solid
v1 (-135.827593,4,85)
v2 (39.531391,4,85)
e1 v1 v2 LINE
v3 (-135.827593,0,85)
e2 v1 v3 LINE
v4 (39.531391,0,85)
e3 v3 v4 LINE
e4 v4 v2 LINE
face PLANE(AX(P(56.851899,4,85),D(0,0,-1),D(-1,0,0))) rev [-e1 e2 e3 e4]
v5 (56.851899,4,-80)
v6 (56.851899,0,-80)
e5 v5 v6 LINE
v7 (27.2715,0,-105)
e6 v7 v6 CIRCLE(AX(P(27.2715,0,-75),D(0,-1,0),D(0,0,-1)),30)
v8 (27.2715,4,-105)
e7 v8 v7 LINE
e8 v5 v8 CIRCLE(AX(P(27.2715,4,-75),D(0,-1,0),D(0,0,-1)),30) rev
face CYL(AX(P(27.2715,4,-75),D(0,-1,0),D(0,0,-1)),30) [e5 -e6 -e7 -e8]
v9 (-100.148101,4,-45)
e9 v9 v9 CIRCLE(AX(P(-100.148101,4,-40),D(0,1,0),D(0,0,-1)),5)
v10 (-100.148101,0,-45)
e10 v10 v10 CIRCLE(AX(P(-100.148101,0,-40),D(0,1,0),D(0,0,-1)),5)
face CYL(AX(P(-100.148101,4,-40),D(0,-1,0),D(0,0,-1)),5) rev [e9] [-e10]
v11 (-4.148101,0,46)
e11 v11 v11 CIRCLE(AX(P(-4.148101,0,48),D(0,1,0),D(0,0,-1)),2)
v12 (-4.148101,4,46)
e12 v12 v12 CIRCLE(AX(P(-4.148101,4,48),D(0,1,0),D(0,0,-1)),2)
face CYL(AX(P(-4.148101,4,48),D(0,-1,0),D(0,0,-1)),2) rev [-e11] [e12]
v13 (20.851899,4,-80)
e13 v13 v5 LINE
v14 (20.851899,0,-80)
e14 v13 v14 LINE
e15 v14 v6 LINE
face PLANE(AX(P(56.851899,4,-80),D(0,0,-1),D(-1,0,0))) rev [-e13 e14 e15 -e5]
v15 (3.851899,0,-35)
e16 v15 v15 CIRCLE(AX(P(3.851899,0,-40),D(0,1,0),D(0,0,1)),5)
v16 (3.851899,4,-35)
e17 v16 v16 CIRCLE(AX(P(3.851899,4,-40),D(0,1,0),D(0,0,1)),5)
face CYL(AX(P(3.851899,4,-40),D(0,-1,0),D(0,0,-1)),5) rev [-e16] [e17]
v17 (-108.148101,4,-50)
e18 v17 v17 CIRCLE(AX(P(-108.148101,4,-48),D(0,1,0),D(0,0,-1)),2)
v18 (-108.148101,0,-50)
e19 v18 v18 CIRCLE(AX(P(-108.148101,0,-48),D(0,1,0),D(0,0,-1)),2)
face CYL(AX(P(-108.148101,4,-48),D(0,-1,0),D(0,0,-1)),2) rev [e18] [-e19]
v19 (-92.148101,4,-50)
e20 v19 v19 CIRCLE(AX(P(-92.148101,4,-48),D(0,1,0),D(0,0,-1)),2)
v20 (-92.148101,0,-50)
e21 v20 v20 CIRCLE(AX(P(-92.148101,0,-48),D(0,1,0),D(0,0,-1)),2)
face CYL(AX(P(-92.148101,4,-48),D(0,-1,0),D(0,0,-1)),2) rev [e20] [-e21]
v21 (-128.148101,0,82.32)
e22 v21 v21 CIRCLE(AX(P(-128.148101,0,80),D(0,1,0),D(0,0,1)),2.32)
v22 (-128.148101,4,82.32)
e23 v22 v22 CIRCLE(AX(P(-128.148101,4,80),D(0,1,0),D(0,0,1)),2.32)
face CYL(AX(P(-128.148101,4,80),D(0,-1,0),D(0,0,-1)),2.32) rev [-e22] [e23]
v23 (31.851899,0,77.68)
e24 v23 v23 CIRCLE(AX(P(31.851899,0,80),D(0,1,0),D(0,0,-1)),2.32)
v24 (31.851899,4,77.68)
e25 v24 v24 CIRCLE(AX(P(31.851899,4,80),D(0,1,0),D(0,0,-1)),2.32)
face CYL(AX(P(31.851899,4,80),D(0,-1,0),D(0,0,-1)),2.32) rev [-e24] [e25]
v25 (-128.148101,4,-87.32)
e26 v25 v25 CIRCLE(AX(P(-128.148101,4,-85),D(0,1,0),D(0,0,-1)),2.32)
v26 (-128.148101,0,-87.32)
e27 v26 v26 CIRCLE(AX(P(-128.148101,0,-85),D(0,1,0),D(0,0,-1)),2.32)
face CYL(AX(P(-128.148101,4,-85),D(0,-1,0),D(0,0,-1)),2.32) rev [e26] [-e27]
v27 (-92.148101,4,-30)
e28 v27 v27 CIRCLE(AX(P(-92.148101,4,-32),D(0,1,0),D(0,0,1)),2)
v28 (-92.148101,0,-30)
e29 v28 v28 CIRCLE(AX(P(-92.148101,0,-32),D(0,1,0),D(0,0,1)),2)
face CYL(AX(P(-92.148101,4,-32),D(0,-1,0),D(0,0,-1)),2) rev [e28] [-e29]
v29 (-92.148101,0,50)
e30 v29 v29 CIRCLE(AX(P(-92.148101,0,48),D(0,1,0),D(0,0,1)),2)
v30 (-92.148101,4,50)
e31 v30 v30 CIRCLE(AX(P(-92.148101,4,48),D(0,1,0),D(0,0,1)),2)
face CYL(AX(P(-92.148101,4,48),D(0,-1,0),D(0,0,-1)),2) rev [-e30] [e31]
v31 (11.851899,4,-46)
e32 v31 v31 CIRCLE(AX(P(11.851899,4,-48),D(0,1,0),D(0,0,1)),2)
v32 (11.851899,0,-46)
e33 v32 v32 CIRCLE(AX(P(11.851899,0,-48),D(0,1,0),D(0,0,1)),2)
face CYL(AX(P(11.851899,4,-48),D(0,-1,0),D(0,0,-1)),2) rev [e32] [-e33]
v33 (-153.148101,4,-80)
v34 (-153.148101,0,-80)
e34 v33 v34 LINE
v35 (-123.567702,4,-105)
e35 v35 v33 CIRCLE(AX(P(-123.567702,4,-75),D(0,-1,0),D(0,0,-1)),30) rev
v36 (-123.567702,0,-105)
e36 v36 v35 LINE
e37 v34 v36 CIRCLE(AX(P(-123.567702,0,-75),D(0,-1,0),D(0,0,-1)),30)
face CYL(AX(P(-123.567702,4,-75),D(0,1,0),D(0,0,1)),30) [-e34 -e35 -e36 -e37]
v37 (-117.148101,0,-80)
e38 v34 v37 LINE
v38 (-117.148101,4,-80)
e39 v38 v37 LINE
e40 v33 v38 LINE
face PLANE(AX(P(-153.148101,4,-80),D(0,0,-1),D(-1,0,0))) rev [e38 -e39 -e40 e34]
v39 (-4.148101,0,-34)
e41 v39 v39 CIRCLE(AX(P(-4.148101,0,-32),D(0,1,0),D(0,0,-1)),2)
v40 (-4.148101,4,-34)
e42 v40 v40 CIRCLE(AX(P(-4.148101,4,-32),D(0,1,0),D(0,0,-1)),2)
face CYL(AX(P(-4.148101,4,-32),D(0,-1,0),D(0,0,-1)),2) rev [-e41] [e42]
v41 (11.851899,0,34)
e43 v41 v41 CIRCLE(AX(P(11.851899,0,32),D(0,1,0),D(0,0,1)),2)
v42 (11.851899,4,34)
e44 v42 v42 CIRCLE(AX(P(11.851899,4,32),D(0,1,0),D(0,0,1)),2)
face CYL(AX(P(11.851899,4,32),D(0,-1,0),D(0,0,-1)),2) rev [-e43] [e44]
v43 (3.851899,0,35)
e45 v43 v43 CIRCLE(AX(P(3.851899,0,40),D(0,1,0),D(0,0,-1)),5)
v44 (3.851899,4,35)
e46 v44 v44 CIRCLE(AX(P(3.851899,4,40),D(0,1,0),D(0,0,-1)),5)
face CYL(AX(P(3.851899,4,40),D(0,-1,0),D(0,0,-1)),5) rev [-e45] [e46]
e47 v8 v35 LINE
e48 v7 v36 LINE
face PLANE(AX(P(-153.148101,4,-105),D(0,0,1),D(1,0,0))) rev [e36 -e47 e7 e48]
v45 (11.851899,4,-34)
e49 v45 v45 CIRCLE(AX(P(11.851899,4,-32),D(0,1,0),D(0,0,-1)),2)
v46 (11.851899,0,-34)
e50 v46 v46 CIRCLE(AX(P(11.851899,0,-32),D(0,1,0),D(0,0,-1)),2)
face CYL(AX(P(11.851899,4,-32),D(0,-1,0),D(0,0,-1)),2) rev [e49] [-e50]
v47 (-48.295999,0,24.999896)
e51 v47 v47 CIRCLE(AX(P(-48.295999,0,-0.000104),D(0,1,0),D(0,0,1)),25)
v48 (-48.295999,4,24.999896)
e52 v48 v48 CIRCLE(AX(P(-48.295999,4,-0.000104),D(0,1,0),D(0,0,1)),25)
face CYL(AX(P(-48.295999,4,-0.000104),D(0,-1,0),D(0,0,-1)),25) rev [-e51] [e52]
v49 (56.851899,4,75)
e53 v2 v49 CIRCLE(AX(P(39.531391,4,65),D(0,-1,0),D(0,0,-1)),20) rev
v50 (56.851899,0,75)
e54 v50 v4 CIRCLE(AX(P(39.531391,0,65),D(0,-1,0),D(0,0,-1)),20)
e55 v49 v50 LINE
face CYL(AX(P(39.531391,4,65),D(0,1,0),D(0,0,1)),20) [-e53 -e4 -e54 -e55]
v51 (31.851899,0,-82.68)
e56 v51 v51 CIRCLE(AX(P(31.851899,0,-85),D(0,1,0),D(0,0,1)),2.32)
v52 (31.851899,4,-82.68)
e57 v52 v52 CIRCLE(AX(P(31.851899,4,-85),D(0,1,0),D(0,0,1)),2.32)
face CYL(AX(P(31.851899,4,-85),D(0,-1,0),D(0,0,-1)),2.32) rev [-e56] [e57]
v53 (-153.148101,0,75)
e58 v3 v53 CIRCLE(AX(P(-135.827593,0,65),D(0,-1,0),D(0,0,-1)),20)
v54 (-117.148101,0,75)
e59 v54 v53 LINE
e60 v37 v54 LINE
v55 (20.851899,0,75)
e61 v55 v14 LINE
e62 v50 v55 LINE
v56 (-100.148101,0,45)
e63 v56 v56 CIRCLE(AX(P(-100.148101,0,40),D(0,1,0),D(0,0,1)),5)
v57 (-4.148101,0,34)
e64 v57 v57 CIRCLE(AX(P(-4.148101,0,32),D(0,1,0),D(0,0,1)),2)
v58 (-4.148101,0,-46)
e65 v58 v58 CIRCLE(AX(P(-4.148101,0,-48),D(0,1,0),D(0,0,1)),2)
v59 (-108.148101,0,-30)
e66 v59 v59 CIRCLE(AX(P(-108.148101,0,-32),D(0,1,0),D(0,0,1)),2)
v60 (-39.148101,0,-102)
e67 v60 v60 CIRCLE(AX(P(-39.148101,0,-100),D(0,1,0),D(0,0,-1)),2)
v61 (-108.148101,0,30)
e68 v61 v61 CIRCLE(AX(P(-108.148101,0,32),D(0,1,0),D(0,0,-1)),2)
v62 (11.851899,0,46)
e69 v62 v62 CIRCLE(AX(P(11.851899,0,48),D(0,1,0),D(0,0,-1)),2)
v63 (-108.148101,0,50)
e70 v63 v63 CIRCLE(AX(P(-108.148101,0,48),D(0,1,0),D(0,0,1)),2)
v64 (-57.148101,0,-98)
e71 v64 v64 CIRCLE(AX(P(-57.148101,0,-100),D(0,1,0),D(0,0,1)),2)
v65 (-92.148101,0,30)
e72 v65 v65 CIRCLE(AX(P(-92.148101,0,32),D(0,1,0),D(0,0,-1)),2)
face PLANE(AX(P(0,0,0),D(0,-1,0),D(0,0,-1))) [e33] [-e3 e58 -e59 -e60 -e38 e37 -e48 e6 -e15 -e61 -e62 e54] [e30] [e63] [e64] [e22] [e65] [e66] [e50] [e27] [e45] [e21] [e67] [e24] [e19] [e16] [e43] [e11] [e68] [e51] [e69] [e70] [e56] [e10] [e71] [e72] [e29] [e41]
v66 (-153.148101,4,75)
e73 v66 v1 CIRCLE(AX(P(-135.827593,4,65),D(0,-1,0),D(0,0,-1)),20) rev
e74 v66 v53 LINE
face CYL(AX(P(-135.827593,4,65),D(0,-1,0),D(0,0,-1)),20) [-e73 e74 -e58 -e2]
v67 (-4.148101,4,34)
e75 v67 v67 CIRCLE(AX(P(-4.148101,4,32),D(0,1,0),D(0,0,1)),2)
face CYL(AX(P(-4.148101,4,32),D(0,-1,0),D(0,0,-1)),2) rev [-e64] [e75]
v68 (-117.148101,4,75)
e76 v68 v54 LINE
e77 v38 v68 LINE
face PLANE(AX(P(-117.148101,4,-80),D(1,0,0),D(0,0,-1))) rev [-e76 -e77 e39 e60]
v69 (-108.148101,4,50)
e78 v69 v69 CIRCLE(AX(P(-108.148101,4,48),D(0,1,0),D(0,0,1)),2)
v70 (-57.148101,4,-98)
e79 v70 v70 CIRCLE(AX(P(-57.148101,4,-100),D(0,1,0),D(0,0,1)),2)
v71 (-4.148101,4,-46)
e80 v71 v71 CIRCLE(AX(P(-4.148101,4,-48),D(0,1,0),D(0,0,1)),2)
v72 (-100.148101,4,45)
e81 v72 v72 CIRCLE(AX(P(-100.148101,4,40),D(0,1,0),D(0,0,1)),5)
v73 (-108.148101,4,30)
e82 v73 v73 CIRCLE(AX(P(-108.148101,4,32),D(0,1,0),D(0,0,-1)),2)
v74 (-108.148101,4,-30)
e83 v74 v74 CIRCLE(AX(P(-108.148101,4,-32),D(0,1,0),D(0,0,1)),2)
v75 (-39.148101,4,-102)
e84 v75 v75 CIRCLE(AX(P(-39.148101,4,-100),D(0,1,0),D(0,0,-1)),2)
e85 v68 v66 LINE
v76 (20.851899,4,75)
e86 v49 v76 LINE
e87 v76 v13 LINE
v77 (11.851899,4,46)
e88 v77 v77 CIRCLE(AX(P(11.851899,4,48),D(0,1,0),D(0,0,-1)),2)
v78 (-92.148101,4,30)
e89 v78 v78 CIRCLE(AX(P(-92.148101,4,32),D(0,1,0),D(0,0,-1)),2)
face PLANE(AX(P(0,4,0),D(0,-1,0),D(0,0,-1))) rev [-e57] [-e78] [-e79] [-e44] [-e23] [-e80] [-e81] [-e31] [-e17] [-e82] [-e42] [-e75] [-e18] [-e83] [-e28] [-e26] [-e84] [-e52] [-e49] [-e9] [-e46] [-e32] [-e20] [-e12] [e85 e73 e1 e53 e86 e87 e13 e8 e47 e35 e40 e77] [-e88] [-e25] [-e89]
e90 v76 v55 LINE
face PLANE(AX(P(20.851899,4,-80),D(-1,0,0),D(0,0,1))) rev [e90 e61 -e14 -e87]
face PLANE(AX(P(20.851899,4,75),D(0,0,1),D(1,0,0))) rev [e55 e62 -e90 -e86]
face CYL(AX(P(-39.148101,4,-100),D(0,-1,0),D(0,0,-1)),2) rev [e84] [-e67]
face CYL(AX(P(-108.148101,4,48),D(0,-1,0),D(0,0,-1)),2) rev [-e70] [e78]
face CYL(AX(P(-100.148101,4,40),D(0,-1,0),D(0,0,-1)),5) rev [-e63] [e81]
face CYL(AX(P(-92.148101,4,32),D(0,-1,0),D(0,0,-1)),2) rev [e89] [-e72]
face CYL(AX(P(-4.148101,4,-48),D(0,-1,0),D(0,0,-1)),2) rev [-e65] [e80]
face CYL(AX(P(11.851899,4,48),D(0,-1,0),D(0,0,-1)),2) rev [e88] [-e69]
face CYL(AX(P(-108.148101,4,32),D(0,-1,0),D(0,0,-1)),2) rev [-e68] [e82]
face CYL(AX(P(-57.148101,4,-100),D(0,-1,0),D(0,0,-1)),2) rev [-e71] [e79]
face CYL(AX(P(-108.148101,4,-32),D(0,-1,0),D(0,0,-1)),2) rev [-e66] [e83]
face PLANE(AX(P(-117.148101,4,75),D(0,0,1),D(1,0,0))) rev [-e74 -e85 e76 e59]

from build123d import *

# Parameters (mm, degrees)
SKETCH1_R           = 25
SKETCH1_R_2         = 2
SKETCH1_R_3         = 2.32
SKETCH1_R_4         = 5
BOSS_EXTRUDE1_DEPTH = 4
FILLET1_R           = 30
FILLET2_R           = 20


with BuildPart() as part:
    # Sketch1 → Boss-Extrude1 (new body)
    with BuildSketch(Plane(origin=(0, 0, 0), x_dir=(1, 0, 0), z_dir=(0, 1, 0))):
        Polygon((-153.14810061, 80), (-117.14810061, 80), (-117.14810061, -75), (-153.14810061, -75), (-153.14810061, -85), (56.85189939, -85), (56.85189939, -75), (20.85189939, -75), (20.85189939, 80), (56.85189939, 80), (56.85189939, 105), (-153.14810061, 105), align=None)
        with Locations(Location((-48.295998841, 0.000104161, 0), (0, 0, 270))):
            Circle(SKETCH1_R, mode=Mode.SUBTRACT)
        with Locations(Location((-57.14810061, 100, 0), (0, 0, 270))):
            Circle(SKETCH1_R_2, mode=Mode.SUBTRACT)
        with Locations(Location((-39.14810061, 100, 0), (0, 0, 90))):
            Circle(SKETCH1_R_2, mode=Mode.SUBTRACT)
        with Locations(Location((-128.14810061, -80, 0), (0, 0, 270))):
            Circle(SKETCH1_R_3, mode=Mode.SUBTRACT)
        with Locations(Location((-128.14810061, 85, 0), (0, 0, 90))):
            Circle(SKETCH1_R_3, mode=Mode.SUBTRACT)
        with Locations(Location((31.85189939, 85, 0), (0, 0, 270))):
            Circle(SKETCH1_R_3, mode=Mode.SUBTRACT)
        with Locations(Location((31.85189939, -80, 0), (0, 0, 90))):
            Circle(SKETCH1_R_3, mode=Mode.SUBTRACT)
        with Locations(Location((-108.14810061, -48, 0), (0, 0, 270))):
            Circle(SKETCH1_R_2, mode=Mode.SUBTRACT)
        with Locations(Location((-92.14810061, -48, 0), (0, 0, 270))):
            Circle(SKETCH1_R_2, mode=Mode.SUBTRACT)
        with Locations(Location((-92.14810061, -32, 0), (0, 0, 90))):
            Circle(SKETCH1_R_2, mode=Mode.SUBTRACT)
        with Locations(Location((-108.14810061, -32, 0), (0, 0, 90))):
            Circle(SKETCH1_R_2, mode=Mode.SUBTRACT)
        with Locations(Location((-100.14810061, -40, 0), (0, 0, 270))):
            Circle(SKETCH1_R_4, mode=Mode.SUBTRACT)
        with Locations(Location((-92.14810061, 48, 0), (0, 0, 90))):
            Circle(SKETCH1_R_2, mode=Mode.SUBTRACT)
        with Locations(Location((-108.14810061, 48, 0), (0, 0, 90))):
            Circle(SKETCH1_R_2, mode=Mode.SUBTRACT)
        with Locations(Location((-92.14810061, 32, 0), (0, 0, 270))):
            Circle(SKETCH1_R_2, mode=Mode.SUBTRACT)
        with Locations(Location((-100.14810061, 40, 0), (0, 0, 90))):
            Circle(SKETCH1_R_4, mode=Mode.SUBTRACT)
        with Locations(Location((-108.14810061, 32, 0), (0, 0, 270))):
            Circle(SKETCH1_R_2, mode=Mode.SUBTRACT)
        with Locations(Location((-4.14810061, -32, 0), (0, 0, 270))):
            Circle(SKETCH1_R_2, mode=Mode.SUBTRACT)
        with Locations(Location((-4.14810061, -48, 0), (0, 0, 90))):
            Circle(SKETCH1_R_2, mode=Mode.SUBTRACT)
        with Locations(Location((3.85189939, -40, 0), (0, 0, 90))):
            Circle(SKETCH1_R_4, mode=Mode.SUBTRACT)
        with Locations(Location((11.85189939, -48, 0), (0, 0, 90))):
            Circle(SKETCH1_R_2, mode=Mode.SUBTRACT)
        with Locations(Location((11.85189939, -32, 0), (0, 0, 270))):
            Circle(SKETCH1_R_2, mode=Mode.SUBTRACT)
        with Locations(Location((-4.14810061, 32, 0), (0, 0, 90))):
            Circle(SKETCH1_R_2, mode=Mode.SUBTRACT)
        with Locations(Location((-4.14810061, 48, 0), (0, 0, 270))):
            Circle(SKETCH1_R_2, mode=Mode.SUBTRACT)
        with Locations(Location((11.85189939, 32, 0), (0, 0, 90))):
            Circle(SKETCH1_R_2, mode=Mode.SUBTRACT)
        with Locations(Location((11.85189939, 48, 0), (0, 0, 270))):
            Circle(SKETCH1_R_2, mode=Mode.SUBTRACT)
        with Locations(Location((3.85189939, 40, 0), (0, 0, 270))):
            Circle(SKETCH1_R_4, mode=Mode.SUBTRACT)
    extrude(amount=BOSS_EXTRUDE1_DEPTH)

    # Fillet1
    # the kernel refuses this fillet: 30 mm, written as the material it takes off along each edge
    with BuildSketch(Plane(origin=(56.85189939, -73.950997289, -105), x_dir=(0, 0, 1), z_dir=(0, 1, 0))) as fillet1_piece_1:
        with BuildLine():
            CenterArc((30, -29.580398915), FILLET1_R, 99.594068227, 80.405931773)
            Line((0, -29.580398916), (-0.6, -29.580398916))
            Line((-0.6, -29.580398916), (-0.6, 0))
            Line((-0.6, 0), (0, 0.6))
            ThreePointArc((0, 0.6), (12.5, 0.6), (24.9, 0.591607978))
            Line((24.9, 0.591607978), (25, 0))
        make_face()
    extrude(amount=151.901994578, mode=Mode.SUBTRACT)
    with BuildSketch(Plane(origin=(-153.14810061, -73.950997289, -105), x_dir=(1, 0, 0), z_dir=(0, 1, 0))) as fillet1_piece_2:
        with BuildLine():
            CenterArc((29.580398916, -30), FILLET1_R, 90, 80.405931773)
            Line((0, -25), (-0.591607978, -24.9))
            ThreePointArc((-0.591607978, -24.9), (-0.6, -12.5), (-0.6, 0))
            Line((-0.6, 0), (0, 0.6))
            Line((0, 0.6), (29.580398916, 0.6))
            Line((29.580398916, 0.6), (29.580398916, 0))
        make_face()
    extrude(amount=151.901994578, mode=Mode.SUBTRACT)

    # Fillet2
    # the kernel refuses this fillet: 20 mm, written as the material it takes off along each edge
    with BuildSketch(Plane(origin=(56.85189939, -43.301270189, 85), x_dir=(0, 0, -1), z_dir=(0, 1, 0))) as fillet2_piece_1:
        with BuildLine():
            CenterArc((20, 17.320508076), FILLET2_R, 180, 60)
            Line((0, 17.320508076), (-0.4, 17.320508076))
            Line((-0.4, 17.320508076), (-0.4, 0))
            Line((-0.4, 0), (0, -0.4))
            ThreePointArc((0, -0.4), (5, -0.4), (9.8, -0.346410162))
            Line((9.8, -0.346410162), (10, 0))
        make_face()
    extrude(amount=90.602540378, mode=Mode.SUBTRACT)
    with BuildSketch(Plane(origin=(-153.14810061, -43.301270189, 85), x_dir=(1, 0, 0), z_dir=(0, 1, 0))) as fillet2_piece_2:
        with BuildLine():
            CenterArc((17.320508076, 20), FILLET2_R, 210, 60)
            Line((0, 10), (-0.346410162, 9.8))
            ThreePointArc((-0.346410162, 9.8), (-0.4, 5), (-0.4, 0))
            Line((-0.4, 0), (0, -0.4))
            Line((0, -0.4), (17.320508076, -0.4))
            Line((17.320508076, -0.4), (17.320508076, 0))
        make_face()
    extrude(amount=90.602540378, mode=Mode.SUBTRACT)


solid = part.part
